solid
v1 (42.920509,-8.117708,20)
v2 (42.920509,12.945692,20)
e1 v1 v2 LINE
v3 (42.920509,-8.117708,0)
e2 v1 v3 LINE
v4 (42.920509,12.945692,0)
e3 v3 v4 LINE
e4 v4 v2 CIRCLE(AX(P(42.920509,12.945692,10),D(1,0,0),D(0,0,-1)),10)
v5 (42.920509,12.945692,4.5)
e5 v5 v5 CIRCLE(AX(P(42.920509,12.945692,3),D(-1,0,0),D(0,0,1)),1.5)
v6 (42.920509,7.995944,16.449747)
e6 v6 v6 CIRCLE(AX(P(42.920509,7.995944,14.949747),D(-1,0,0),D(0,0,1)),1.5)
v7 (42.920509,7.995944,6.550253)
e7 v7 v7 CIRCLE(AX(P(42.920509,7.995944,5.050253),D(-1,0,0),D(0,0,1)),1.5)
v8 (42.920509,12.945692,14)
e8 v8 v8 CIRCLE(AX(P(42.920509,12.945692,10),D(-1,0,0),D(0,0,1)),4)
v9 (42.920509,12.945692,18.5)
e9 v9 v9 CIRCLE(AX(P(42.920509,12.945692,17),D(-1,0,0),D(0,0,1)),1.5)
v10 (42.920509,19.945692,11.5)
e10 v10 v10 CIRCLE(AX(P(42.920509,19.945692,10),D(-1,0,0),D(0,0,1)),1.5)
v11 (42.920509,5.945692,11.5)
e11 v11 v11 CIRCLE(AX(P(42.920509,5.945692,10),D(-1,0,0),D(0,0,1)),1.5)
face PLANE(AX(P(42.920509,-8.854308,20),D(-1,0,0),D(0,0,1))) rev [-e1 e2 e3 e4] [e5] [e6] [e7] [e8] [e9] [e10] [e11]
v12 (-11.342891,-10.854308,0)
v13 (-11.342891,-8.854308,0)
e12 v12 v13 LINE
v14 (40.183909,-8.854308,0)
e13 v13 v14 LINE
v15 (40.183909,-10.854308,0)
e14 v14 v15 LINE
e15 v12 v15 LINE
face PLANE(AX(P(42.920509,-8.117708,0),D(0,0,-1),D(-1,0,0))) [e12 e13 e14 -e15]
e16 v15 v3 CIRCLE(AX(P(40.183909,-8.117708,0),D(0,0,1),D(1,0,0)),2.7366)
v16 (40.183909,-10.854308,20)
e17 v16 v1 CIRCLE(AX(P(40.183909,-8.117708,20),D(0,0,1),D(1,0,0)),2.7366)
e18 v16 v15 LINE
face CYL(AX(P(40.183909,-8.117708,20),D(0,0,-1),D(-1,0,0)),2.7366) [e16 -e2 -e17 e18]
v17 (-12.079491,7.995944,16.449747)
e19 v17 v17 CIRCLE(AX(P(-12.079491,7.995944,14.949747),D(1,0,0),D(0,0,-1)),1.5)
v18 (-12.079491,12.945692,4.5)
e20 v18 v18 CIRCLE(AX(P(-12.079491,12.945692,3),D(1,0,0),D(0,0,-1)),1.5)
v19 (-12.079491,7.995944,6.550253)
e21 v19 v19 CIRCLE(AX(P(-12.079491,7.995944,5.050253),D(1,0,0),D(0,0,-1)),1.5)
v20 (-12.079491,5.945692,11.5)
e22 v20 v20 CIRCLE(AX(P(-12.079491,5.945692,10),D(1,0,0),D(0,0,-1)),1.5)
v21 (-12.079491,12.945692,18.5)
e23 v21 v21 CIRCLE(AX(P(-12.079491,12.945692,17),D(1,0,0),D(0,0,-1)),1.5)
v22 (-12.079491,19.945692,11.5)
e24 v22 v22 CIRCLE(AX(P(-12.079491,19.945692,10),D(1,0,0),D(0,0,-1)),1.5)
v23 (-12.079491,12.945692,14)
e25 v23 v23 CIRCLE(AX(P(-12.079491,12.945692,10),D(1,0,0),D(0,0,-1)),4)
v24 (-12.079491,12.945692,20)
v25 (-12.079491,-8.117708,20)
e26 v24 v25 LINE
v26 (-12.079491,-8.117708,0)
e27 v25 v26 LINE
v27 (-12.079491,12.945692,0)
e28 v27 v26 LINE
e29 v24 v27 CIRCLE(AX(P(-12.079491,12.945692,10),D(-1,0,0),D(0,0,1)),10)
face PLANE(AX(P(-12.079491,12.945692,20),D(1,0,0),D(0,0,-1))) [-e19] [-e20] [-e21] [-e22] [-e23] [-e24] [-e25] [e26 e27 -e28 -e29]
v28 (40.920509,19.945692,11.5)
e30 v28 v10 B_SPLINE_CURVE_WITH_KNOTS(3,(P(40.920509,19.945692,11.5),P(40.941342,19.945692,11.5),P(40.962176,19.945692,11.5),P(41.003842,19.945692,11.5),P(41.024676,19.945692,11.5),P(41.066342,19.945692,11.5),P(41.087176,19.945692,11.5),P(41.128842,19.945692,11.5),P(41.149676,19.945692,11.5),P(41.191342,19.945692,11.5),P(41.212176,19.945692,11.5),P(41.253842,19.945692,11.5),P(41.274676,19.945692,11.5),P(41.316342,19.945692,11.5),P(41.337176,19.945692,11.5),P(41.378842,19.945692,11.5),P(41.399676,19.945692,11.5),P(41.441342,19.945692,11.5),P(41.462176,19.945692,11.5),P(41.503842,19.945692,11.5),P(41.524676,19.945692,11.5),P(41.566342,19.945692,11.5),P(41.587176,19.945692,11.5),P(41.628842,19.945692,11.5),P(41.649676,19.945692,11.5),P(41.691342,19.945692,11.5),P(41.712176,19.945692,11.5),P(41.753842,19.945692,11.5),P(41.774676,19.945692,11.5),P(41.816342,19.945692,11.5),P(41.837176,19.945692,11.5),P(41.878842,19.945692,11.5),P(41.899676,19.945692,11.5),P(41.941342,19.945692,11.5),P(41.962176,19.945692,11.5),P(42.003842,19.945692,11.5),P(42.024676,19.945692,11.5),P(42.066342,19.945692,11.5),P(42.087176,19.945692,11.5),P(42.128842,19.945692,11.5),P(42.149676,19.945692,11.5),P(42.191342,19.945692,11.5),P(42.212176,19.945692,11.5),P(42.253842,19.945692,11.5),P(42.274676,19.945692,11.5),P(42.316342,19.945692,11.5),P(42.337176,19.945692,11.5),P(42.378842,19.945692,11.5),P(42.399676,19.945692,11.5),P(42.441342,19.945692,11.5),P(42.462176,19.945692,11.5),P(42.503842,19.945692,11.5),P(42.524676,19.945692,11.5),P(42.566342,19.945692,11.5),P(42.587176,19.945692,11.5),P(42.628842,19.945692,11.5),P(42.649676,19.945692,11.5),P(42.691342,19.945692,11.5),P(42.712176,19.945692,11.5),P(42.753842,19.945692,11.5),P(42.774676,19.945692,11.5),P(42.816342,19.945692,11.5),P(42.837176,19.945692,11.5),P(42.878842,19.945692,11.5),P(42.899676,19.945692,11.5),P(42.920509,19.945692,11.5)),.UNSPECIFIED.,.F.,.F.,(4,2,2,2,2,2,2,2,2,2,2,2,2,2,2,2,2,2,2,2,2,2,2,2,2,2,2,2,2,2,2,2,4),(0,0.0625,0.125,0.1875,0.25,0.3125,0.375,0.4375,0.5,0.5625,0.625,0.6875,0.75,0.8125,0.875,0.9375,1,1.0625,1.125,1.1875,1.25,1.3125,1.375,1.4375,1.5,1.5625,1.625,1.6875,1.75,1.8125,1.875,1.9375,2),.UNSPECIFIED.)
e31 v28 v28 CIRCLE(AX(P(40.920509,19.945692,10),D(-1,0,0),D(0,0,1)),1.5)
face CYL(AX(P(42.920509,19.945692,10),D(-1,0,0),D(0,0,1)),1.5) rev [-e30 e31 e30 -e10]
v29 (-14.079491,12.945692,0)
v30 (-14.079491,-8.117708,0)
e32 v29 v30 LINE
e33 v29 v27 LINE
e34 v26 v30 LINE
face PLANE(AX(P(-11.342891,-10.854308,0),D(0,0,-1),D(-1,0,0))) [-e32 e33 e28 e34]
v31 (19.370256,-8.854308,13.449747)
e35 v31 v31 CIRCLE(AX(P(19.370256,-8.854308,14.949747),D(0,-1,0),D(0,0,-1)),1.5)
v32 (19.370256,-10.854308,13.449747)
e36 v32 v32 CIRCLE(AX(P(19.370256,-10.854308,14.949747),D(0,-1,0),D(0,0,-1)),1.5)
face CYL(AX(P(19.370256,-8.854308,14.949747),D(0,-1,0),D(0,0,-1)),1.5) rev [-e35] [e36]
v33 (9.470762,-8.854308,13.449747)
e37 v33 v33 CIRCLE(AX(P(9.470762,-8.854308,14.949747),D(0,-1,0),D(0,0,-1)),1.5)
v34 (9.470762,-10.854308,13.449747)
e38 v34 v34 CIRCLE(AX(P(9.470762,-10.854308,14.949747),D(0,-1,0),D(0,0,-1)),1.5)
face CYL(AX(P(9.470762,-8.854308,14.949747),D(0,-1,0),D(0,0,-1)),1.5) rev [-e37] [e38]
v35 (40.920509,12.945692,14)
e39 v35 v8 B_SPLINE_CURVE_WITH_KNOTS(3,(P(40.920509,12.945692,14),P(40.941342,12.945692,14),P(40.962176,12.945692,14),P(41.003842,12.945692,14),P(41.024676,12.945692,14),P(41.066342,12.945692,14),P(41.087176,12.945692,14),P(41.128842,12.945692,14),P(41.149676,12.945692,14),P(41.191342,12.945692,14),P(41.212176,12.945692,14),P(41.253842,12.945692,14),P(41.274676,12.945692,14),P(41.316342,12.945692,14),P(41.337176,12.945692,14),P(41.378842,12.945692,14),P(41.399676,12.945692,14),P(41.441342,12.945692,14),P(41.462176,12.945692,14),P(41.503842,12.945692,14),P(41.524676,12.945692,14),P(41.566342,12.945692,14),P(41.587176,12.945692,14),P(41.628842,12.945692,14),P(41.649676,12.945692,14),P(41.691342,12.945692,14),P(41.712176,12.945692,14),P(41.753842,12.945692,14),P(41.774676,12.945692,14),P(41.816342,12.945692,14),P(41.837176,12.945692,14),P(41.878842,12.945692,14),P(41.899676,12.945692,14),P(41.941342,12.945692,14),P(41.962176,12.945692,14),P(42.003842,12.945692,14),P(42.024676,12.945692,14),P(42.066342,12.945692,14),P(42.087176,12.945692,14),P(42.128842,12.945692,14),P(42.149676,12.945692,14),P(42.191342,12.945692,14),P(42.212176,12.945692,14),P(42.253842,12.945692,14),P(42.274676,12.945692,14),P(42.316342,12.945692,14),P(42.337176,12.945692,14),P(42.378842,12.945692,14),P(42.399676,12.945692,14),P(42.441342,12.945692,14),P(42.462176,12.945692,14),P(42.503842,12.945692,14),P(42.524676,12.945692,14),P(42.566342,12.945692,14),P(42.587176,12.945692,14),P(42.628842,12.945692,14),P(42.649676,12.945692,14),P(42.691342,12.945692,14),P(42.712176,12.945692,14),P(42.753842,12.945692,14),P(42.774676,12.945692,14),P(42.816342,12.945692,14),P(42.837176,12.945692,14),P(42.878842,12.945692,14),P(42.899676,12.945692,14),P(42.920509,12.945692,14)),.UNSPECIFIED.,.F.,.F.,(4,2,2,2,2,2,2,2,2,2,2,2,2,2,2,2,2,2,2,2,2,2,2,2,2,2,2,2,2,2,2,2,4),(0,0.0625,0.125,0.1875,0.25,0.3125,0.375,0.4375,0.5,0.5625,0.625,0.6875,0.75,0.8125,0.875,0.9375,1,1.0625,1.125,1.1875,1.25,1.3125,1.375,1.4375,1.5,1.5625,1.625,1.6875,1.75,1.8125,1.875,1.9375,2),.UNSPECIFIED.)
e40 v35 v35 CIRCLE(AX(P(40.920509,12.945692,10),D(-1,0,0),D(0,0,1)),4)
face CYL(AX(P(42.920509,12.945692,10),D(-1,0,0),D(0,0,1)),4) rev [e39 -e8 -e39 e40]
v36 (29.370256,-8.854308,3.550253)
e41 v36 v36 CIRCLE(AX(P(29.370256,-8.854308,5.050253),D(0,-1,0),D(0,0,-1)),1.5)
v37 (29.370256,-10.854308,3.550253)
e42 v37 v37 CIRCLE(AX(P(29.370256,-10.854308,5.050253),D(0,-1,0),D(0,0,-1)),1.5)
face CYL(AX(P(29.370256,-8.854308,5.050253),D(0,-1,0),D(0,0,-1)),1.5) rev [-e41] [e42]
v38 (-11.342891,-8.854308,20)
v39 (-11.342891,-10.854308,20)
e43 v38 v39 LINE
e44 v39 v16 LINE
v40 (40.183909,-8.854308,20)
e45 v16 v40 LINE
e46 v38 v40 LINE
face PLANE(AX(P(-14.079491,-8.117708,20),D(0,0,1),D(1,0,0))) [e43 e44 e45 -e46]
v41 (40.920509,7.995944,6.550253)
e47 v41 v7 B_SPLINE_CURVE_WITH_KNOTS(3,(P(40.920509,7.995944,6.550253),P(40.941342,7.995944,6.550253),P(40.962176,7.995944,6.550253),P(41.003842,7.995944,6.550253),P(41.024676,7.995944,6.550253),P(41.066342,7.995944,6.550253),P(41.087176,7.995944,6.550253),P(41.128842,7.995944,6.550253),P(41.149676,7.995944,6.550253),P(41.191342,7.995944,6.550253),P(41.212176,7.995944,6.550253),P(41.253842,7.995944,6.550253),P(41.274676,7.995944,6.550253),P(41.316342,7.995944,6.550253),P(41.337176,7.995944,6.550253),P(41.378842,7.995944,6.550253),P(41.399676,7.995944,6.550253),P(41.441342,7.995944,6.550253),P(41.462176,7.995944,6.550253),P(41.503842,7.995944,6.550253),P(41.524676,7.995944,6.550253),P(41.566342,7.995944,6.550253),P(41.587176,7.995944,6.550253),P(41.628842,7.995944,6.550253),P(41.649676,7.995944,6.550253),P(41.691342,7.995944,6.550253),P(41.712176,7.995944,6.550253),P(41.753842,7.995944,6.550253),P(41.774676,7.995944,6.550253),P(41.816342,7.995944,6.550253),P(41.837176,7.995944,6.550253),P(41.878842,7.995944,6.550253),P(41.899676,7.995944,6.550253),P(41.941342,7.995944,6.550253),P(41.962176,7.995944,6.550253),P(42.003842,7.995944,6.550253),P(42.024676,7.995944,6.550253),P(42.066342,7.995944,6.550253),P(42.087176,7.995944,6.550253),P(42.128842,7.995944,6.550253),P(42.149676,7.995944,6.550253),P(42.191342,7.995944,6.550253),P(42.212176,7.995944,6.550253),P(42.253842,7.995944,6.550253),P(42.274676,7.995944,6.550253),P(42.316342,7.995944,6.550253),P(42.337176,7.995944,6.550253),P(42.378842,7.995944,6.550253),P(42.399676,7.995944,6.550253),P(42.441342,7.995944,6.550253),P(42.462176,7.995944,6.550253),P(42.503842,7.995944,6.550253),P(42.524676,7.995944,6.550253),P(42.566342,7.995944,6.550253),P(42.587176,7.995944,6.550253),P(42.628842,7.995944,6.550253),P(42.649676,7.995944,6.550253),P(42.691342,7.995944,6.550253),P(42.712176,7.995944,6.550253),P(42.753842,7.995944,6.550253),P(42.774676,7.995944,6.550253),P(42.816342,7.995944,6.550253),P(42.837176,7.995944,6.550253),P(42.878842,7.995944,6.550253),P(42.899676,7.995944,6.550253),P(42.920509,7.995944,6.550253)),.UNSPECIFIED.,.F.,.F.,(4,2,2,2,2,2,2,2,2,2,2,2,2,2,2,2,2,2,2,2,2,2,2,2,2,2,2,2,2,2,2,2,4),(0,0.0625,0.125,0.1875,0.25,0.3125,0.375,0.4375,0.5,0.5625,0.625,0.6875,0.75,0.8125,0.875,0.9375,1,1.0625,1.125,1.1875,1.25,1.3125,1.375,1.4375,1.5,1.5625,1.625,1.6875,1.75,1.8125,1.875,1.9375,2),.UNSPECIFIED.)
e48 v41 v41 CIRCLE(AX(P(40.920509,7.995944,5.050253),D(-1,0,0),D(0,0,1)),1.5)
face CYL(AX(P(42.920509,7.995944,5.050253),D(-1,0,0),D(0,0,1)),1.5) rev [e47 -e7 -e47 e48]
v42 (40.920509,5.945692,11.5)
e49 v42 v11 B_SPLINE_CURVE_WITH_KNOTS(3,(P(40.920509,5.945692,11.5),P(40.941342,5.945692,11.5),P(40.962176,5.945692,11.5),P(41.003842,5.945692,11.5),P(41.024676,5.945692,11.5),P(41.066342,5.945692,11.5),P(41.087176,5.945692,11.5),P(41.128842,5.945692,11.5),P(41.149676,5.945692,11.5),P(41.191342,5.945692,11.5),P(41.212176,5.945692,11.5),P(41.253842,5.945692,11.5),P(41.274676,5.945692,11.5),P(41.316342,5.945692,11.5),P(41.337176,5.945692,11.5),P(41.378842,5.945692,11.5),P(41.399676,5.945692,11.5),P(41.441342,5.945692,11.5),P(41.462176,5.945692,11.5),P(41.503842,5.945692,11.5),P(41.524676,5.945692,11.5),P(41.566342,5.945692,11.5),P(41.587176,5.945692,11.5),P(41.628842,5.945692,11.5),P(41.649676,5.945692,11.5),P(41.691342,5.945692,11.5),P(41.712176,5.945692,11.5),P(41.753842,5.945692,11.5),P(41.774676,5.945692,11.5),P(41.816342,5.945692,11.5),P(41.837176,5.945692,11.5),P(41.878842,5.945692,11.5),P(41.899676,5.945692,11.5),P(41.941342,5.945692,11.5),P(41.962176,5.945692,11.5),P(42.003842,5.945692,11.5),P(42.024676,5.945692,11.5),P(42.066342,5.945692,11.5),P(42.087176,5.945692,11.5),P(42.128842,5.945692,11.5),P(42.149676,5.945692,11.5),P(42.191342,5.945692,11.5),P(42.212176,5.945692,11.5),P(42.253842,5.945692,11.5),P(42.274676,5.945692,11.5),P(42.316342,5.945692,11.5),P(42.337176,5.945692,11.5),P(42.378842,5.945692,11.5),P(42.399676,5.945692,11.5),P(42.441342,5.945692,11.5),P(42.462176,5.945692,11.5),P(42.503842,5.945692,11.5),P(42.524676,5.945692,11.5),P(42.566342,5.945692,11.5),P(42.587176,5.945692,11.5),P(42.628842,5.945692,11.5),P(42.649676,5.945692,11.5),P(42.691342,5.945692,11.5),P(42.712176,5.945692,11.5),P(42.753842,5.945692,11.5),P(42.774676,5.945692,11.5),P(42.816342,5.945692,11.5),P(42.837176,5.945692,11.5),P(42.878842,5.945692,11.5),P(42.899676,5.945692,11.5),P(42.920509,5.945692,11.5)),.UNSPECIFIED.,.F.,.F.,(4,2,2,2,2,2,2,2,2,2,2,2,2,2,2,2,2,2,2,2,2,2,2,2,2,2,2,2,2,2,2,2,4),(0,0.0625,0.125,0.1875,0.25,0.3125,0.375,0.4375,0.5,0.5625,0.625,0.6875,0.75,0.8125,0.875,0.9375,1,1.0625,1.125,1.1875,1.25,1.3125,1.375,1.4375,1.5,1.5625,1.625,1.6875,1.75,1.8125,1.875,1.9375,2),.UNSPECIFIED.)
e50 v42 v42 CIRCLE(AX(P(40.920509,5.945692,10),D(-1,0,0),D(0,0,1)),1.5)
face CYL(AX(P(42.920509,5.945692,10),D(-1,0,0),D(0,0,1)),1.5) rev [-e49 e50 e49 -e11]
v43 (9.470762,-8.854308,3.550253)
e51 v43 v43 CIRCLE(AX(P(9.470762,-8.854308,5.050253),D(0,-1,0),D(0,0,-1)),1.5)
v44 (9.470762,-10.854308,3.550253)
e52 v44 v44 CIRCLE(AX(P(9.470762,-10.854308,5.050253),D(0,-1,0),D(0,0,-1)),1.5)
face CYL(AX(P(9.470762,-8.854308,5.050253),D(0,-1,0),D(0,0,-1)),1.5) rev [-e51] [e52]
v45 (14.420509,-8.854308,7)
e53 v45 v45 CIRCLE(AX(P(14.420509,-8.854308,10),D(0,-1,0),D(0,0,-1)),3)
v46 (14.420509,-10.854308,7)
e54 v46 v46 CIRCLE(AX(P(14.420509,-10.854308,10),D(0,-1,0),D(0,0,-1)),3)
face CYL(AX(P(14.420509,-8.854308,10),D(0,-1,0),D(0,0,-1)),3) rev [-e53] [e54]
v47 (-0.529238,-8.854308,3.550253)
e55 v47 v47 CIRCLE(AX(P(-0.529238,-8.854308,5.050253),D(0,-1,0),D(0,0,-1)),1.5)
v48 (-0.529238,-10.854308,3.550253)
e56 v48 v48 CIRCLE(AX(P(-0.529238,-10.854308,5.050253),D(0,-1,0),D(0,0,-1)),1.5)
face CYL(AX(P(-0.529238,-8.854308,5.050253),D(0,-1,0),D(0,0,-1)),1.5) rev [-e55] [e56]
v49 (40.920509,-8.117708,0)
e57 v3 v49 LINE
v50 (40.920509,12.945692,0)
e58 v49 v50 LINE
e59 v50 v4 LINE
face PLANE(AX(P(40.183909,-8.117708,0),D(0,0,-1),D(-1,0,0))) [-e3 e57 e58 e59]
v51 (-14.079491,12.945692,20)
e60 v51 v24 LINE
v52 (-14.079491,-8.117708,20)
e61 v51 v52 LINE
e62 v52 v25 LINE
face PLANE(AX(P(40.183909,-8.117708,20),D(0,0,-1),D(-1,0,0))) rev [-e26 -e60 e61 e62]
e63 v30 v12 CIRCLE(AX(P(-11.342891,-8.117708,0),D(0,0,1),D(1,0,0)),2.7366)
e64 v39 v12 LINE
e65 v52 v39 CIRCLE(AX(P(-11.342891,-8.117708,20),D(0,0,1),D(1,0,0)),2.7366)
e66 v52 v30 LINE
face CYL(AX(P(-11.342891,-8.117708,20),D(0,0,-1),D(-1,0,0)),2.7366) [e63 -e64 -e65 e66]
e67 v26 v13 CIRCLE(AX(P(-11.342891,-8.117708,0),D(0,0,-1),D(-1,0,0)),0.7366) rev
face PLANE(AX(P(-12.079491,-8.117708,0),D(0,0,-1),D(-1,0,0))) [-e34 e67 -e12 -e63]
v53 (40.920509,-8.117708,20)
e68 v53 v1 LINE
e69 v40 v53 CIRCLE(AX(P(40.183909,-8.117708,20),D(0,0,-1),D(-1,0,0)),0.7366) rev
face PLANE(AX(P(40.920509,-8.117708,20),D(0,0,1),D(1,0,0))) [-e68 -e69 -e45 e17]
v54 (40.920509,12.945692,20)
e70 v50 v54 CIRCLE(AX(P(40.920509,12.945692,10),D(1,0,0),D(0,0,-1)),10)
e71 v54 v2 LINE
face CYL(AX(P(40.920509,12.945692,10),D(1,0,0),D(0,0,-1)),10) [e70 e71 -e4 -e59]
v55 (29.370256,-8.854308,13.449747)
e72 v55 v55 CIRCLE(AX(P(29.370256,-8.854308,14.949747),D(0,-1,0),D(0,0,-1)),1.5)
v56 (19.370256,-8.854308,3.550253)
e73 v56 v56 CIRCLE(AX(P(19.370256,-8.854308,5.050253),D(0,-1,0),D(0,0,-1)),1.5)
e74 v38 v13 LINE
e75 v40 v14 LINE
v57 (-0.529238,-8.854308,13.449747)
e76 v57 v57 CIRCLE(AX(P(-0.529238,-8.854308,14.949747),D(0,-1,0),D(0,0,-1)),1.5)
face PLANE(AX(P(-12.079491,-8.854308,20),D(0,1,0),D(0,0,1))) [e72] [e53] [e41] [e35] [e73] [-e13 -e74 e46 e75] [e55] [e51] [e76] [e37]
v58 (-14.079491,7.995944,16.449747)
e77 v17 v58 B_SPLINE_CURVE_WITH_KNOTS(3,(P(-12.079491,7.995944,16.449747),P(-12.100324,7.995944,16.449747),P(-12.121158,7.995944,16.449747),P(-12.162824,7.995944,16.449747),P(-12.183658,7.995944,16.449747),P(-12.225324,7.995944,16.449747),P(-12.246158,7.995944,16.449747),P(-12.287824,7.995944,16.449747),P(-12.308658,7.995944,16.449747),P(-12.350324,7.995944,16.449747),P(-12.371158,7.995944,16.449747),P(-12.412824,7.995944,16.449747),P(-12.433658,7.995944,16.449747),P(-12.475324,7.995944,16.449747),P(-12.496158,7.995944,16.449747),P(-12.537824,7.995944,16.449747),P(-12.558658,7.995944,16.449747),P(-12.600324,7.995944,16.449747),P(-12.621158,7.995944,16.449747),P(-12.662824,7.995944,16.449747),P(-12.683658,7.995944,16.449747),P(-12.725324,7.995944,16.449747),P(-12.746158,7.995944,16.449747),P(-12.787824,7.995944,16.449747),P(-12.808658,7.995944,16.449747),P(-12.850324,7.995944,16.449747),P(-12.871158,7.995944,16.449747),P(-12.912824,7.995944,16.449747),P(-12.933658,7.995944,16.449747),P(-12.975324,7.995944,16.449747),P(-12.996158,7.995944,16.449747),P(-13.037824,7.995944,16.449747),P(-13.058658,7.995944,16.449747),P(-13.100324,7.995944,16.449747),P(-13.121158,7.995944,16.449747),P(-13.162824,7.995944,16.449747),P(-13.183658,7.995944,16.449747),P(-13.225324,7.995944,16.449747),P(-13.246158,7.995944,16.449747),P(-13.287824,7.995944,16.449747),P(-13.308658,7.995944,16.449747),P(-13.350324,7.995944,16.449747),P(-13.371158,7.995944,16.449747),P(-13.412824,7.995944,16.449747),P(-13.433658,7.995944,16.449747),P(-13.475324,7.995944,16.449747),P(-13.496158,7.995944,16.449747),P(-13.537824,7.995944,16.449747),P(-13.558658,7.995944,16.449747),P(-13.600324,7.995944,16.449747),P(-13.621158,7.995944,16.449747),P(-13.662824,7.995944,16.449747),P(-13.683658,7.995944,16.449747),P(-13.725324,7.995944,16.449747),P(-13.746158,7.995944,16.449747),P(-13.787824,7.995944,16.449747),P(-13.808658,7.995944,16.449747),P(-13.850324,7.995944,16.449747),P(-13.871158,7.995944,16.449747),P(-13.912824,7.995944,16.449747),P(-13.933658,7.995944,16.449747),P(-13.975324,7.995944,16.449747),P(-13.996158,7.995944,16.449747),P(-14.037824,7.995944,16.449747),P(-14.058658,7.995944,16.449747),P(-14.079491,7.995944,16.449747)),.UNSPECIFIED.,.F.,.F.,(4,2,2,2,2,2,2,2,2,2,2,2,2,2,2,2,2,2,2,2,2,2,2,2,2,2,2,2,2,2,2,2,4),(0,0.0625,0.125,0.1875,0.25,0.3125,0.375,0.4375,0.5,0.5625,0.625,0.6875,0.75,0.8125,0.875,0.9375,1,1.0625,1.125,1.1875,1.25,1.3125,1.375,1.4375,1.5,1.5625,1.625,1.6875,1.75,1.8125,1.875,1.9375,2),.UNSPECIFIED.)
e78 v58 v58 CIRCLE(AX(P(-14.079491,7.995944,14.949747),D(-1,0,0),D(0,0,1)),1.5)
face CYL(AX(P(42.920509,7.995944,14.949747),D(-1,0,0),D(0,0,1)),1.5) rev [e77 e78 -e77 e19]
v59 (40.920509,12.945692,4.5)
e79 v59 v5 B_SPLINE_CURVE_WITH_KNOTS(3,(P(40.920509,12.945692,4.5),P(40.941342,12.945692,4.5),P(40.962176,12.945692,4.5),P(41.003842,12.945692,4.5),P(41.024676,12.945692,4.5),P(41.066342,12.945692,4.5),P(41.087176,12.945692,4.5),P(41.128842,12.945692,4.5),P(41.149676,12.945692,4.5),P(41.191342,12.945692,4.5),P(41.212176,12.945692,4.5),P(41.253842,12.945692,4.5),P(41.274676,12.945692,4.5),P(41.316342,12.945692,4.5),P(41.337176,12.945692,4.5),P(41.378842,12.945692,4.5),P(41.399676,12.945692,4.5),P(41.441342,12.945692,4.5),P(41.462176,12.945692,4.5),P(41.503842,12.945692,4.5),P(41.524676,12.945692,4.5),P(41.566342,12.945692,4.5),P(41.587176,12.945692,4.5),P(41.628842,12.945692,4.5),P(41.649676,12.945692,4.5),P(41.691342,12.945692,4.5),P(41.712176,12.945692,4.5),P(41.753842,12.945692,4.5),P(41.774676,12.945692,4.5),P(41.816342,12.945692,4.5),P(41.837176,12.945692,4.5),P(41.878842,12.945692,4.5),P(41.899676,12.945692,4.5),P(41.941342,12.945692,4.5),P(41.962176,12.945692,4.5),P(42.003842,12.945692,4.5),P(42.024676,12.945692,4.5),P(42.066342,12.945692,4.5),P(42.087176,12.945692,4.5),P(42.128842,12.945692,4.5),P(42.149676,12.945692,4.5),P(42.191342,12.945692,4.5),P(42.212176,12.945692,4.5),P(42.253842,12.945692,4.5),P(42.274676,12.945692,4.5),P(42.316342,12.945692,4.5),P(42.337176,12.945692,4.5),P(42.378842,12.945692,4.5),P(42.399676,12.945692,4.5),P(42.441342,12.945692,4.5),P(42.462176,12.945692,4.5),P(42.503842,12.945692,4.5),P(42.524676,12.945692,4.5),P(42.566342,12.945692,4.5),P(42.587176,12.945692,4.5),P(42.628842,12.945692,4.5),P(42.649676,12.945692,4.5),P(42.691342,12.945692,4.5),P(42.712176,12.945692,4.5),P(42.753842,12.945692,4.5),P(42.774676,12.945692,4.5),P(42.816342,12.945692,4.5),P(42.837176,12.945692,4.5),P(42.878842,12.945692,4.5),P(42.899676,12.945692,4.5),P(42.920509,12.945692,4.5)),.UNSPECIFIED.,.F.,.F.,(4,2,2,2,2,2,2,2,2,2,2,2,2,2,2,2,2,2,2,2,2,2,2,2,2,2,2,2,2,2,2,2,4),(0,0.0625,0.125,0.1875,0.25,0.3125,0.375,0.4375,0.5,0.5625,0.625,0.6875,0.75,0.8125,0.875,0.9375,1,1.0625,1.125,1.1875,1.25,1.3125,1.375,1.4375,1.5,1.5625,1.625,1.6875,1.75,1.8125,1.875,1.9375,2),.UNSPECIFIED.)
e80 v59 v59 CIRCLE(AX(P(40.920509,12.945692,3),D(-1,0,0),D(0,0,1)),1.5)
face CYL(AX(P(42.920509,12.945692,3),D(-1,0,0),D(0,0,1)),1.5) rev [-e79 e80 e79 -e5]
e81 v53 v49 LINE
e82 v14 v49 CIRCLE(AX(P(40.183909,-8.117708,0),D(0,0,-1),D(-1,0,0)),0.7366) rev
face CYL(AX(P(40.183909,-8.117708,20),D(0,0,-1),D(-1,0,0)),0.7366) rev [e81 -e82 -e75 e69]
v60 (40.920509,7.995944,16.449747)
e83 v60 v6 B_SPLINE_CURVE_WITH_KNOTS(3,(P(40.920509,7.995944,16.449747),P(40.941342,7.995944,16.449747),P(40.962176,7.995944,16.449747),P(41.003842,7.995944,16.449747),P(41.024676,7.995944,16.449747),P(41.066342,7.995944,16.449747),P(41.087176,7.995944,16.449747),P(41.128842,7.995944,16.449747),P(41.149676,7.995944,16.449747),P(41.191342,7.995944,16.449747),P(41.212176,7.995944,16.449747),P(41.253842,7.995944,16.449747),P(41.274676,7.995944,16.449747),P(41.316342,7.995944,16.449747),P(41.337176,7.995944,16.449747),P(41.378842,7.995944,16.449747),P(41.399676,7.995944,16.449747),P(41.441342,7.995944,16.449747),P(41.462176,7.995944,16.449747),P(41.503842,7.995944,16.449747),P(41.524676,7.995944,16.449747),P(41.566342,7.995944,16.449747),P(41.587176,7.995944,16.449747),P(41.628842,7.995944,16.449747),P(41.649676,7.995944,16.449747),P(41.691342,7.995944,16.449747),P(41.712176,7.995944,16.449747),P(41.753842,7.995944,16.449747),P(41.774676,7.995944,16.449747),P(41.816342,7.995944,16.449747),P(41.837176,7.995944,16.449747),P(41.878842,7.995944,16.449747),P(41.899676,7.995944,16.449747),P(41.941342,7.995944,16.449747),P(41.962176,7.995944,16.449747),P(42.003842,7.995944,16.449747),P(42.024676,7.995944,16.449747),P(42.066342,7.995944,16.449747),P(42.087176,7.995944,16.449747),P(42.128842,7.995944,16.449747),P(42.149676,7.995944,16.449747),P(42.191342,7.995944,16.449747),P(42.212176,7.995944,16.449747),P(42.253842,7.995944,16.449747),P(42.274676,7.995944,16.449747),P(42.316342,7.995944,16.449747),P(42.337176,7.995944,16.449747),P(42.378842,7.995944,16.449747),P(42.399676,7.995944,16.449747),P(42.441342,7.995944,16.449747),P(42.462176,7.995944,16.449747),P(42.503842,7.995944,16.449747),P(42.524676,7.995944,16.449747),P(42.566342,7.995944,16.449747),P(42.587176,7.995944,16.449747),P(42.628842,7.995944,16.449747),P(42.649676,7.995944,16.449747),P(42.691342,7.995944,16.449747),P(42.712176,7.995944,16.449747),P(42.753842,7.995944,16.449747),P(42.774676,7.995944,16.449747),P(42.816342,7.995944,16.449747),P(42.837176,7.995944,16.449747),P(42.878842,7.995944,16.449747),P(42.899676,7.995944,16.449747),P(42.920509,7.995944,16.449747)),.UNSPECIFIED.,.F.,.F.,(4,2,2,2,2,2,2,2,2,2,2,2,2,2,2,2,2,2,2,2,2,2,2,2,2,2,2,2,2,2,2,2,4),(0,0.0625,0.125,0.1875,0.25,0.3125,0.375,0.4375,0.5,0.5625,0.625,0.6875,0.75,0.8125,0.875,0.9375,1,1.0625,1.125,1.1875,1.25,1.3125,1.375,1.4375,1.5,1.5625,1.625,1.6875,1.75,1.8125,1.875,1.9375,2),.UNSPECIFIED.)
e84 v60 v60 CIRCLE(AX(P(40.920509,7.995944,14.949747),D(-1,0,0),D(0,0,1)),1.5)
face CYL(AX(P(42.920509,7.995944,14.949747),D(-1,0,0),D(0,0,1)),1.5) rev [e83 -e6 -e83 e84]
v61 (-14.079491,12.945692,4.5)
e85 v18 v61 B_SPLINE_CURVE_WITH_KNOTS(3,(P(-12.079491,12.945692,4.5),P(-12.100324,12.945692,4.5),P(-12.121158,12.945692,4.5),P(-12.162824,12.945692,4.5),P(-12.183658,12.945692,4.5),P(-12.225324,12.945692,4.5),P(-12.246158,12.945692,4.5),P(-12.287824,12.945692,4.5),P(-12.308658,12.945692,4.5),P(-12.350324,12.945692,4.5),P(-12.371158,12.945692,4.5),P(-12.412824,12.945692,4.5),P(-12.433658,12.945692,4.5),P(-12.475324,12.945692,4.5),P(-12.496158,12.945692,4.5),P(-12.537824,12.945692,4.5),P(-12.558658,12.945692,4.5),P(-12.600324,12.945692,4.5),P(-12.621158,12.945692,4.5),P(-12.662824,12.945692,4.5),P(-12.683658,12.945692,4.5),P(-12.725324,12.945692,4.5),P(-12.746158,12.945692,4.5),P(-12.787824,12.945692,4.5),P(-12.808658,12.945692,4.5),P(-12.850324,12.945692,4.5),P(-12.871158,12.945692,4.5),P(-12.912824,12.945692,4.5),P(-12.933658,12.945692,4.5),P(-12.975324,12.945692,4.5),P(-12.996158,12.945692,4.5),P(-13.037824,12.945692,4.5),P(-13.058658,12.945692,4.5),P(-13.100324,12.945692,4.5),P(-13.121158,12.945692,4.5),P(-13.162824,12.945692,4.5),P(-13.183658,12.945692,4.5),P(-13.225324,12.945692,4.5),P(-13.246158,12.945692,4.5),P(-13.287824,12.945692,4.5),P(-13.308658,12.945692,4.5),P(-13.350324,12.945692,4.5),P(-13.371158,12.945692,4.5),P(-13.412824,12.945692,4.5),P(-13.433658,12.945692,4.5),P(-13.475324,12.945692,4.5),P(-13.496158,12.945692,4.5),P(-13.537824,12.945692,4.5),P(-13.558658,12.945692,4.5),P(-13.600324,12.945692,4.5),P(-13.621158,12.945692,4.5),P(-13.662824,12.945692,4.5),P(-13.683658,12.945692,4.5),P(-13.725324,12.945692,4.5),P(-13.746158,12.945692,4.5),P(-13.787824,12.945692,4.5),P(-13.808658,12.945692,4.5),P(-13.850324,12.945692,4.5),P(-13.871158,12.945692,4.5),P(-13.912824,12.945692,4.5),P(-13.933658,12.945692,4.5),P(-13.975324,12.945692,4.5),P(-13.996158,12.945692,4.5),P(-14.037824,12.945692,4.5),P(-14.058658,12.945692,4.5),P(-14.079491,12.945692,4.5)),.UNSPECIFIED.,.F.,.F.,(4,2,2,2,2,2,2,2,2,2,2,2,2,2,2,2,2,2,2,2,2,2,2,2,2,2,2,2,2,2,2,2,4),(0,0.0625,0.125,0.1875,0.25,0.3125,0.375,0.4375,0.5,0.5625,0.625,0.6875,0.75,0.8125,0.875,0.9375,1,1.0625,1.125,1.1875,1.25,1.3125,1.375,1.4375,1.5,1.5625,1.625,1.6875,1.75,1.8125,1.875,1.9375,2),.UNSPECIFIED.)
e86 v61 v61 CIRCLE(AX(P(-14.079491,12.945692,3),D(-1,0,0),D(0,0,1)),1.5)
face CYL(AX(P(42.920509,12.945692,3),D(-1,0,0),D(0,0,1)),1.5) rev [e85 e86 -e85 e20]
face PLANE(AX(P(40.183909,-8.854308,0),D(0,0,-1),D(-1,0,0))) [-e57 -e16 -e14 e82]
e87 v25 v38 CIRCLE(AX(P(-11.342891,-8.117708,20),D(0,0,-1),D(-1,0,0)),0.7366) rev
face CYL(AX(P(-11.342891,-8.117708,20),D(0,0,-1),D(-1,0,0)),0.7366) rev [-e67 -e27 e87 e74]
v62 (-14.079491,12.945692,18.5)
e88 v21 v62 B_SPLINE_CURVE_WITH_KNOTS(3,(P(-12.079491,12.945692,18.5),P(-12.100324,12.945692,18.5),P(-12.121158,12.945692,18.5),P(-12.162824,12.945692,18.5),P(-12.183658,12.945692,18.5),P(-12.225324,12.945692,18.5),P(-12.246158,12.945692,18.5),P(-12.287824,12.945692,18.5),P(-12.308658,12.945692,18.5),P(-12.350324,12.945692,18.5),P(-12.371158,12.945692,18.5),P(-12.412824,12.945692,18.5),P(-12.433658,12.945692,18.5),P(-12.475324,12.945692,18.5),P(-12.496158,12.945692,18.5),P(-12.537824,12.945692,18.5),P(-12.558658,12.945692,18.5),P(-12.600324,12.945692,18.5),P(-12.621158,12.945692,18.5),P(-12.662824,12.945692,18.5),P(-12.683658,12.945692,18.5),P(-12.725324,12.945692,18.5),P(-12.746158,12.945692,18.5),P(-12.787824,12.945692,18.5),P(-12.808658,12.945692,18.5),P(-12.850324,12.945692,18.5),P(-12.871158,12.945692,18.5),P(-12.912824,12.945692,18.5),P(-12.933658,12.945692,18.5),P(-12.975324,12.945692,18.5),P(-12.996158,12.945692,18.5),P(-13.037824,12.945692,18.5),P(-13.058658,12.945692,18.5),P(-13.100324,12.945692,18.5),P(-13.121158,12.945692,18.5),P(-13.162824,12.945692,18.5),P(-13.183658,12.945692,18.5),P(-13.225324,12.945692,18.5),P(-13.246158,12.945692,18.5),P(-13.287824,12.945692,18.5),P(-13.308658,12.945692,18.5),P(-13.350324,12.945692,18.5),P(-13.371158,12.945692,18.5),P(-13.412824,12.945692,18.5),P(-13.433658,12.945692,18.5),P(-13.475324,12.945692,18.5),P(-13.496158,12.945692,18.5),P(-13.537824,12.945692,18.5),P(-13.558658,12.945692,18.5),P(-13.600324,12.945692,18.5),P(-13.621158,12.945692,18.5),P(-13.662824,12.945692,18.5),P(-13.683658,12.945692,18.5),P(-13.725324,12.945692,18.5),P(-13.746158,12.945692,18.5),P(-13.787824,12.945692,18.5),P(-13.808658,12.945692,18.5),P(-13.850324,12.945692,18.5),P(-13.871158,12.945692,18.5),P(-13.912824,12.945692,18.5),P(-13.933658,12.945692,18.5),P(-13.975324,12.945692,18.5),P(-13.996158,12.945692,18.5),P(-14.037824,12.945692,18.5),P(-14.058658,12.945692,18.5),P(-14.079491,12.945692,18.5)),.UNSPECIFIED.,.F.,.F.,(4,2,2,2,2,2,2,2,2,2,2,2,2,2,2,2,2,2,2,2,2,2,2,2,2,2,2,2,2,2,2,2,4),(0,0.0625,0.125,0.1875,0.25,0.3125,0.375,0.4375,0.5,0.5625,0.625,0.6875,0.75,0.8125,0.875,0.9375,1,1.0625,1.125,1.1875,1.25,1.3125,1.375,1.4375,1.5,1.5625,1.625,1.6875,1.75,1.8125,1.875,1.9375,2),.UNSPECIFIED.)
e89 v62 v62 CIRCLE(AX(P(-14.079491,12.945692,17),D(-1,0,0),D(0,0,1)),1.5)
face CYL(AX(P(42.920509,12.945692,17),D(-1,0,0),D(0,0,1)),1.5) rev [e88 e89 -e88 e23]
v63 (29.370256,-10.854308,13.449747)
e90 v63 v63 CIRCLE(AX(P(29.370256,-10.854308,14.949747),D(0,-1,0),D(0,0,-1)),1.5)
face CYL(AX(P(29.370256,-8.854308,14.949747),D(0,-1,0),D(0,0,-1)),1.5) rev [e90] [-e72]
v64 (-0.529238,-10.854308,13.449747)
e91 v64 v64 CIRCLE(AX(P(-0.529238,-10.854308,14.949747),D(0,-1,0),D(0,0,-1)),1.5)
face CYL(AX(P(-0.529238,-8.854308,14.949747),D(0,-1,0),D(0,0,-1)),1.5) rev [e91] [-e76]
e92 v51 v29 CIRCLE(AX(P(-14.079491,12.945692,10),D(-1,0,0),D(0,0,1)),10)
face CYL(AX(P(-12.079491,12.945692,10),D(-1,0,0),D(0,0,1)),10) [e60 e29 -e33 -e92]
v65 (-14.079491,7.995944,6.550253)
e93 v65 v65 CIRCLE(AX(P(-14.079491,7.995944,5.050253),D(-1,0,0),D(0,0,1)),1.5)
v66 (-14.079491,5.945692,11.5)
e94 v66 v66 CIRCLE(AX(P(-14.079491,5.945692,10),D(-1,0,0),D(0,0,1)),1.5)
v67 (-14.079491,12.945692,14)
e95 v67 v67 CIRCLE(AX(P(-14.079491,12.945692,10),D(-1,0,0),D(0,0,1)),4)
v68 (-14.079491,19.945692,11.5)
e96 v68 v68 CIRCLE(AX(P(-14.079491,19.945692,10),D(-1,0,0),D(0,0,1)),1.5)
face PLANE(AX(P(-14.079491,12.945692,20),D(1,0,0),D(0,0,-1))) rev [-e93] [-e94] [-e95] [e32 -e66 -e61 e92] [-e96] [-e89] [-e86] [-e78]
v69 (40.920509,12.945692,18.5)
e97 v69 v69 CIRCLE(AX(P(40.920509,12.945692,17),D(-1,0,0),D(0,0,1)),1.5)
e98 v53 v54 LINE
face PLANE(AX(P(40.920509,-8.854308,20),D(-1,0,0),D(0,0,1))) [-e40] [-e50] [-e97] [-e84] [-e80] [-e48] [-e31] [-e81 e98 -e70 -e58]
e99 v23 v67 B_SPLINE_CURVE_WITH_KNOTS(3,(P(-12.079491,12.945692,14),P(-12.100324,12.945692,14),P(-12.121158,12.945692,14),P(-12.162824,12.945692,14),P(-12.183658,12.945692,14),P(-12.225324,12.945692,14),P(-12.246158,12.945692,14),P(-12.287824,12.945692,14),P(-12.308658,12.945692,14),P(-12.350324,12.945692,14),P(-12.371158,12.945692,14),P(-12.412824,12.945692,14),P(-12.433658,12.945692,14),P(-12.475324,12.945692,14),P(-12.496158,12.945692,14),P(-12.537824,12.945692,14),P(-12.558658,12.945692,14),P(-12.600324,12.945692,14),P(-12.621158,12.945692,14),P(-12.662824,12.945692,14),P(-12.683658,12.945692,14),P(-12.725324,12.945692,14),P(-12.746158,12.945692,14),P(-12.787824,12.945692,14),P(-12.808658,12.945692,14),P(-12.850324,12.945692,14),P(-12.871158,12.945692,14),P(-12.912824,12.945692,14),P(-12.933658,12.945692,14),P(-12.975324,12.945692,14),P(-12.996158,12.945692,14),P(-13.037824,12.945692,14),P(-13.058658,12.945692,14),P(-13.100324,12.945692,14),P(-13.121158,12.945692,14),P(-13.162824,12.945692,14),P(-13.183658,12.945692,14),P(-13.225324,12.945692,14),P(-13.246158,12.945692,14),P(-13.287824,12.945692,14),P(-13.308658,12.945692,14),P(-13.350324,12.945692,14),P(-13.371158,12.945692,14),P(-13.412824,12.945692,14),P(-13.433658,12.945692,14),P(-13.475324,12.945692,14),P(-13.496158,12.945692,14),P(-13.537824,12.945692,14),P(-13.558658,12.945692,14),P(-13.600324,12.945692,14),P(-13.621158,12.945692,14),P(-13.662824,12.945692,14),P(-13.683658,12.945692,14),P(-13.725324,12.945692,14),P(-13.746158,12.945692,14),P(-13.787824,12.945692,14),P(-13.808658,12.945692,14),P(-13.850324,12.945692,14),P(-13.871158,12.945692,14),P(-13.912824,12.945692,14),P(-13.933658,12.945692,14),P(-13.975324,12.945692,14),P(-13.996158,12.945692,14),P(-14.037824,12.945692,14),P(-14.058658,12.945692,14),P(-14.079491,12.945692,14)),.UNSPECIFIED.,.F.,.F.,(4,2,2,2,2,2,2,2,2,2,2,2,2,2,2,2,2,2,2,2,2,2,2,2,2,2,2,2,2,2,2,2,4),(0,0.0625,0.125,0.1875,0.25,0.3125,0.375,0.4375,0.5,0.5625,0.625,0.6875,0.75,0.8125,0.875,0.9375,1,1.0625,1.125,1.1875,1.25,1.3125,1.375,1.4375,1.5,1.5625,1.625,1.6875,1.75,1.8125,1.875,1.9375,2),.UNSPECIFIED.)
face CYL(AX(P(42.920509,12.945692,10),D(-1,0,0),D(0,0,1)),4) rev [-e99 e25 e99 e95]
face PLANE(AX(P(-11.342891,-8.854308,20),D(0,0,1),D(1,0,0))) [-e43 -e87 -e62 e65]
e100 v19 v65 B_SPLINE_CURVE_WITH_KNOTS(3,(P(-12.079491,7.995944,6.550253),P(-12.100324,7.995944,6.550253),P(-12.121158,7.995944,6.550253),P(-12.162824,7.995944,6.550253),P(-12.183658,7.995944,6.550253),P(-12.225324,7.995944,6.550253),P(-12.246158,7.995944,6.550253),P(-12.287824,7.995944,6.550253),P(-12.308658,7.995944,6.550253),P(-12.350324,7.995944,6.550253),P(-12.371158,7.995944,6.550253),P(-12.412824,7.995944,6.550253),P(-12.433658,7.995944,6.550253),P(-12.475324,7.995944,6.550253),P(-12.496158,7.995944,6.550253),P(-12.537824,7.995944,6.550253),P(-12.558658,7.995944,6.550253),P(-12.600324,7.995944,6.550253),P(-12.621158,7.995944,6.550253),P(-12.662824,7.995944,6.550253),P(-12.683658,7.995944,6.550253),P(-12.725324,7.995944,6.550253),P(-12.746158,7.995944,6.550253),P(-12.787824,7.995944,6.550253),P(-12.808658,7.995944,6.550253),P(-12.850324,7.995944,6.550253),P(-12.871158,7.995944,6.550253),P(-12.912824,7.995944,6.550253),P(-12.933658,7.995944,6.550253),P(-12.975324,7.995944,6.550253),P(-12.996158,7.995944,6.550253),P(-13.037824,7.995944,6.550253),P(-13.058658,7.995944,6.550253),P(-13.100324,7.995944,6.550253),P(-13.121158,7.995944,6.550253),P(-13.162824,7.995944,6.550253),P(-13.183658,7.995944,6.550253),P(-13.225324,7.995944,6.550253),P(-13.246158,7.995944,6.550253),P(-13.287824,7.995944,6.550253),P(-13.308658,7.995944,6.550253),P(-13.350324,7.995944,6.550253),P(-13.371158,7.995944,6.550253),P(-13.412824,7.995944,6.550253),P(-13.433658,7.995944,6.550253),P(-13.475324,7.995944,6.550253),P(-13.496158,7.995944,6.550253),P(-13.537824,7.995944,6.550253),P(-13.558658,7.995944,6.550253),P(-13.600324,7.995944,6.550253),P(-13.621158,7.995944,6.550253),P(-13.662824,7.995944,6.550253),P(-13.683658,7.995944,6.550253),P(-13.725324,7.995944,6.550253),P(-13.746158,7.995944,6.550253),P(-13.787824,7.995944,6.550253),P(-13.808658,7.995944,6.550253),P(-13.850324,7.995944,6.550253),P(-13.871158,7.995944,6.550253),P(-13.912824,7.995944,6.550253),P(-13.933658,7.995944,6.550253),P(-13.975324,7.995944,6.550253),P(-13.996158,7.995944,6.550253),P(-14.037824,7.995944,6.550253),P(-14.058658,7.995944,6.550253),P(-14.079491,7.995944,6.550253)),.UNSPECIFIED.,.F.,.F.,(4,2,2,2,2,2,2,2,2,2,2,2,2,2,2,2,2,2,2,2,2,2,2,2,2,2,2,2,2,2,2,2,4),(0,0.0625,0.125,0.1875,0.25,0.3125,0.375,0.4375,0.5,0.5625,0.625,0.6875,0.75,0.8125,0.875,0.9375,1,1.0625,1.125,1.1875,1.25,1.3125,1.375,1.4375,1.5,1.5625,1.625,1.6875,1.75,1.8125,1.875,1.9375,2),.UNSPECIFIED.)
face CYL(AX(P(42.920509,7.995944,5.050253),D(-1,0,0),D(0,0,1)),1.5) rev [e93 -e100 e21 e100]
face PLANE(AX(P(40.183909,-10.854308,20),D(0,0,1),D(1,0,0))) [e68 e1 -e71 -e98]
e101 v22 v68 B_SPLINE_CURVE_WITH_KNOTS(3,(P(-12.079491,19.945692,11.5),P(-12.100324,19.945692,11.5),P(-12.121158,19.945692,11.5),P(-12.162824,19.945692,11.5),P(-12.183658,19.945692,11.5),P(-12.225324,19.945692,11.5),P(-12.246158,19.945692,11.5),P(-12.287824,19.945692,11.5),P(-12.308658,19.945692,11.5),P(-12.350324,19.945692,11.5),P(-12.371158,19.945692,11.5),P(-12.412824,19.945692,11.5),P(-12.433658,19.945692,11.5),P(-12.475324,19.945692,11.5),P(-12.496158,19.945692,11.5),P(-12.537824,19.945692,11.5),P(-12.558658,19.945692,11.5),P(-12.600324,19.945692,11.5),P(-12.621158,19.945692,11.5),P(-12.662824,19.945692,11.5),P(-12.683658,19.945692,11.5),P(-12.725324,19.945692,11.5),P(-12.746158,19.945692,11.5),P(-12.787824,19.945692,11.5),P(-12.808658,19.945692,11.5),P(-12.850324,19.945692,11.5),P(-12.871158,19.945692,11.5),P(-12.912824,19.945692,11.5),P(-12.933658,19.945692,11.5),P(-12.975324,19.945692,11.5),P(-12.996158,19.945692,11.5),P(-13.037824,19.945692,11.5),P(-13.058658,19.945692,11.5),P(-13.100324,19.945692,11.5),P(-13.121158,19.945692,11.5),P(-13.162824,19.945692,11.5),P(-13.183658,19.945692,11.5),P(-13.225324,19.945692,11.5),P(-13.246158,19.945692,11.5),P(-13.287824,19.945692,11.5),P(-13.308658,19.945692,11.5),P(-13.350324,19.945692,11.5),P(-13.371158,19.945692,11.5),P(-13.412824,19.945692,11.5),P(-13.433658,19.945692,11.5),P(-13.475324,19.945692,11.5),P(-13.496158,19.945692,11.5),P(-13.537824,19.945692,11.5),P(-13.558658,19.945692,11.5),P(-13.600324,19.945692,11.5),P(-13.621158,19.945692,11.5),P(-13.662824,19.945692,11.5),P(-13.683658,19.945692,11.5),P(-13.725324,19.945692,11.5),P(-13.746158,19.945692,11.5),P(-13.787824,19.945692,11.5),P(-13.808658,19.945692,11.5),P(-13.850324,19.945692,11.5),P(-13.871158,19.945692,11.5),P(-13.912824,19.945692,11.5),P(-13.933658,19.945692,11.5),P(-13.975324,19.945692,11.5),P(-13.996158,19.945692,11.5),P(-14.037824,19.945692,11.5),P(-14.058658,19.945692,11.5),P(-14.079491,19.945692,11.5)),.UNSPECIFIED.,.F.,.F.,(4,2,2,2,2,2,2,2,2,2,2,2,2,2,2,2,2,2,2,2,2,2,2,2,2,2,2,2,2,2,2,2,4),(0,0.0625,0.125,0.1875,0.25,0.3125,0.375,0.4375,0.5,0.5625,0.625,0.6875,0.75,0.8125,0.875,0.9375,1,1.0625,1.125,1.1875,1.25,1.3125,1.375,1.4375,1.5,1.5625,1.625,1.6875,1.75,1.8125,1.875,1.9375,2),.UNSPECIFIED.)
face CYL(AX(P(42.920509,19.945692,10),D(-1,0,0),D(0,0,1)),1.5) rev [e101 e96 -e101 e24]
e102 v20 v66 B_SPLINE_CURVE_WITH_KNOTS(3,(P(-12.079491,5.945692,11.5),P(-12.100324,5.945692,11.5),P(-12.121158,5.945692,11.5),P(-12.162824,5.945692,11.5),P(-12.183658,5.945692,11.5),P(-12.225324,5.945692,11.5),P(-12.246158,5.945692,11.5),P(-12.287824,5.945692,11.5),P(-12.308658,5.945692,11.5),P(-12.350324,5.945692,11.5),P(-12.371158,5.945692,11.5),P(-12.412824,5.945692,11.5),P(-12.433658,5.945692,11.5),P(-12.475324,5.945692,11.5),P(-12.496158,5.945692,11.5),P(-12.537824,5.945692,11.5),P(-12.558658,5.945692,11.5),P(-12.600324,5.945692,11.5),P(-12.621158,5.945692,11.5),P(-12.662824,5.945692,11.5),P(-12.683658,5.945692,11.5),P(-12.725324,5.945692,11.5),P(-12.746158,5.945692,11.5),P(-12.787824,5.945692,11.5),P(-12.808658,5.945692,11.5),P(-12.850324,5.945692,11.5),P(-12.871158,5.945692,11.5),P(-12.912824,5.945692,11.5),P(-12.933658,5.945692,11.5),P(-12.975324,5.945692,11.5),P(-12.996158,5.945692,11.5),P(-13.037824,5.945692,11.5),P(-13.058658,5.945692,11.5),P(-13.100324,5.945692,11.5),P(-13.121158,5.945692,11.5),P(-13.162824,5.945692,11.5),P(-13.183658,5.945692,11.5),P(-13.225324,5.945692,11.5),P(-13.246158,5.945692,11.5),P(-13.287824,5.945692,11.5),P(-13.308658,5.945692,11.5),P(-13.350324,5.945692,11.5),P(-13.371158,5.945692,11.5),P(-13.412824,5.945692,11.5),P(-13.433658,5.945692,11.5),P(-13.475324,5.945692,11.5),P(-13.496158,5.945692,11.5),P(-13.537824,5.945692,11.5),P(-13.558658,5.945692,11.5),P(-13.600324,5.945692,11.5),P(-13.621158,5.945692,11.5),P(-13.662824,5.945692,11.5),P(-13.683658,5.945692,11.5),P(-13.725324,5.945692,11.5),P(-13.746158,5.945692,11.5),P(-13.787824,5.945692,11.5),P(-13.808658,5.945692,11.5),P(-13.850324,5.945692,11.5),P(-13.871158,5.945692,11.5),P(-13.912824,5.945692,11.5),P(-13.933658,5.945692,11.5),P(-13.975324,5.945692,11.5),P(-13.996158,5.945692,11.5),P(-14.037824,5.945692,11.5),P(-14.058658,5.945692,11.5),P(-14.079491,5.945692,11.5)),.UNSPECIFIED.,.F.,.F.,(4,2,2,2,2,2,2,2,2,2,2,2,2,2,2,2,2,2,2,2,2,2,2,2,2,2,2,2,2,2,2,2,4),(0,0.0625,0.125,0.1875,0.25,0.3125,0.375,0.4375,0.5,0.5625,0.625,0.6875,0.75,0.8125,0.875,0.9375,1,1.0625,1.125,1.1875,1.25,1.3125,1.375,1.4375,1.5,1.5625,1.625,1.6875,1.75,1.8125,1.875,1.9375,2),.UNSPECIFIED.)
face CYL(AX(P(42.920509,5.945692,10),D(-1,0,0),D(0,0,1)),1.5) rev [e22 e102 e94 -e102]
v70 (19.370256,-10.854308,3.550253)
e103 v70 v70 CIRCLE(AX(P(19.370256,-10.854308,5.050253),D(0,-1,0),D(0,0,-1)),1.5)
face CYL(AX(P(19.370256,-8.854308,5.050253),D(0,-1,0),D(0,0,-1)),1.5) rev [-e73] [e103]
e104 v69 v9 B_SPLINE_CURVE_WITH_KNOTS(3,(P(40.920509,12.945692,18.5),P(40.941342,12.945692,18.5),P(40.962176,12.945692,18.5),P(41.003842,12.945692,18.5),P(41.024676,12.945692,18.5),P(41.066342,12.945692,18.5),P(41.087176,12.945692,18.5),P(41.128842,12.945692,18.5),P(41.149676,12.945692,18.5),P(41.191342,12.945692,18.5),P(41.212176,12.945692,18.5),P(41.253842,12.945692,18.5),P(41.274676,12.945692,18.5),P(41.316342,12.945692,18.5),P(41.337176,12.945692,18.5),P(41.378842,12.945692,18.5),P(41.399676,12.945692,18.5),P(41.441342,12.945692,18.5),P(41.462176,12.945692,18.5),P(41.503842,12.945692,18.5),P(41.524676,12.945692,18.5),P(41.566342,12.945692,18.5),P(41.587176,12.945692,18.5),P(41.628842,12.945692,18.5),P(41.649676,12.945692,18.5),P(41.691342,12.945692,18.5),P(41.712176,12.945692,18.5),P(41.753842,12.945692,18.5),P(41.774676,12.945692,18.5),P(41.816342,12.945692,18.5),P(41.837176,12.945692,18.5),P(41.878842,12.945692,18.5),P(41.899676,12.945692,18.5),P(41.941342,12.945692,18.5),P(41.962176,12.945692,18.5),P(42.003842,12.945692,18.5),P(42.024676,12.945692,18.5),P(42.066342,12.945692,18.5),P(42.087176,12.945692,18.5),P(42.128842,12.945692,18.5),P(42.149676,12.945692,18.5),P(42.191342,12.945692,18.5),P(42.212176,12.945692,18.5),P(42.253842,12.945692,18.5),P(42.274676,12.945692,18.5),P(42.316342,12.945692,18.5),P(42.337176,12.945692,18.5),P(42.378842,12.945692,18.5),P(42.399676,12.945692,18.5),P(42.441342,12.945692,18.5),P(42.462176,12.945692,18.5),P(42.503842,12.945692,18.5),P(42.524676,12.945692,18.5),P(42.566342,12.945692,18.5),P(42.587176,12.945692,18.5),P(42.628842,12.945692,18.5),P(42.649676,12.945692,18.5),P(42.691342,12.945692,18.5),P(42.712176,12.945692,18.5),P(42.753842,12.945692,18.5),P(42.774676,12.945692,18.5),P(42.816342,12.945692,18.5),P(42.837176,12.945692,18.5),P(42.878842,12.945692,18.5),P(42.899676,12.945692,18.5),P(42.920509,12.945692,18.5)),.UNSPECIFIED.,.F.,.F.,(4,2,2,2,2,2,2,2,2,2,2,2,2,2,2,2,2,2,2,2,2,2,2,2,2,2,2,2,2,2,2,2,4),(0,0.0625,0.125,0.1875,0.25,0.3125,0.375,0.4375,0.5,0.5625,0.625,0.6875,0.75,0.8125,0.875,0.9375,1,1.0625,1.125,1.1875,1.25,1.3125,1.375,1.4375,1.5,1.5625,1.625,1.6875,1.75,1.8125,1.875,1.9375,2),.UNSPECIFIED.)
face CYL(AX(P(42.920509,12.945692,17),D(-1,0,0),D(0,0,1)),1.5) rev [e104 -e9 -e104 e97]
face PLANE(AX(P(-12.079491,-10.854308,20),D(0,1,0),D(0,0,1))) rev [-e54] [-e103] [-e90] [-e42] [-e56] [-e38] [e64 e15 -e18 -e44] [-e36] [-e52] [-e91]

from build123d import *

# Parameters (mm, degrees)
SM_BASE_FLANGE_1_DEPTH = 20
EXTRUDE_1_DEPTH        = 2
EXTRUDE_START          = -2
EXTRUDE_2_DEPTH        = 2
SKETCH_8_R             = 4
SKETCH_8_R_2           = 1.5
CUT_EXTRUDE_1_DEPTH    = 65.618145883
SKETCH_9_R             = 3
SKETCH_9_R_2           = 1.5
CUT_EXTRUDE_2_DEPTH    = 2


# Sheet-metal steps are written as plain solids
with BuildPart() as part:
    # Sketch 1 → 基体-法兰1 (new body)
    with BuildSketch(Plane.XY):
        with BuildLine():
            Line((-12.079491004, 12.945691914), (-12.079491004, -8.117708086))
            ThreePointArc((-12.079491004, -8.117708086), (-11.863745859, -8.638562941), (-11.342891004, -8.854308086))
            Line((-11.342891004, -8.854308086), (40.183908996, -8.854308086))
            ThreePointArc((40.183908996, -8.854308086), (40.704763851, -8.638562941), (40.920508996, -8.117708086))
            Line((40.920508996, -8.117708086), (40.920508996, 12.945691914))
            Line((40.920508996, 12.945691914), (42.920508996, 12.945691914))
            Line((42.920508996, 12.945691914), (42.920508996, -8.117708086))
            ThreePointArc((42.920508996, -8.117708086), (42.118977413, -10.052776503), (40.183908996, -10.854308086))
            Line((40.183908996, -10.854308086), (-11.342891004, -10.854308086))
            ThreePointArc((-11.342891004, -10.854308086), (-13.277959422, -10.052776503), (-14.079491004, -8.117708086))
            Line((-14.079491004, -8.117708086), (-14.079491004, 12.945691914))
            Line((-14.079491004, 12.945691914), (-12.079491004, 12.945691914))
        make_face()
    extrude(amount=SM_BASE_FLANGE_1_DEPTH)

    # 草图6 → 凸台-拉伸1 (add)
    with BuildSketch(Plane.ZY.offset(14.079491004)):
        with BuildLine():
            Line((0, 12.945691914), (20, 12.945691914))
            ThreePointArc((20, 12.945691914), (10, 22.945691914), (0, 12.945691914))
        make_face()
    extrude(amount=-EXTRUDE_1_DEPTH)

    # 草图7 → 凸台-拉伸2 (add)
    with BuildSketch(Plane(origin=(42.920508996, 0, 0), x_dir=(0, 0, -1), z_dir=(1, 0, 0)).offset(EXTRUDE_START)):
        with BuildLine():
            Line((-20, 12.945691914), (0, 12.945691914))
            ThreePointArc((0, 12.945691914), (-10, 22.945691914), (-20, 12.945691914))
        make_face()
    extrude(amount=EXTRUDE_2_DEPTH)

    # 草图8 → 切除-拉伸1 (cut, through all)
    with BuildSketch(Plane.ZY.offset(14.079491004)):
        with Locations((10, 12.945691914)):
            Circle(SKETCH_8_R)
        with Locations((10, 19.945691914)):
            Circle(SKETCH_8_R_2)
        with Locations((17, 12.945691914)):
            Circle(SKETCH_8_R_2)
        with Locations((14.949747468, 7.995944446)):
            Circle(SKETCH_8_R_2)
        with Locations((10, 5.945691914)):
            Circle(SKETCH_8_R_2)
        with Locations((5.050252532, 7.995944446)):
            Circle(SKETCH_8_R_2)
        with Locations((3, 12.945691914)):
            Circle(SKETCH_8_R_2)
    extrude(amount=-CUT_EXTRUDE_1_DEPTH, mode=Mode.SUBTRACT)

    # 草图9 → 切除-拉伸2 (cut)
    with BuildSketch(Plane(origin=(0, -10.854308086, 0), x_dir=(-1, 0, 0), z_dir=(0, -1, 0))):
        with Locations(Location((-14.420508996, -10, 0), (0, 0, 90))):
            Circle(SKETCH_9_R)
        with Locations(Location((-29.370256464, -5.050252532, 0), (0, 0, 90))):
            Circle(SKETCH_9_R_2)
        with Locations(Location((-19.370256464, -5.050252532, 0), (0, 0, 90))):
            Circle(SKETCH_9_R_2)
        with Locations(Location((-9.470761527, -5.050252532, 0), (0, 0, 90))):
            Circle(SKETCH_9_R_2)
        with Locations(Location((-19.370256464, -14.949747468, 0), (0, 0, 90))):
            Circle(SKETCH_9_R_2)
        with Locations(Location((-9.470761527, -14.949747468, 0), (0, 0, 90))):
            Circle(SKETCH_9_R_2)
        with Locations(Location((-29.370256464, -14.949747468, 0), (0, 0, 90))):
            Circle(SKETCH_9_R_2)
        with Locations(Location((0.529238473, -5.050252532, 0), (0, 0, 90))):
            Circle(SKETCH_9_R_2)
        with Locations(Location((0.529238473, -14.949747468, 0), (0, 0, 90))):
            Circle(SKETCH_9_R_2)
    extrude(amount=-CUT_EXTRUDE_2_DEPTH, mode=Mode.SUBTRACT)


solid = part.part
